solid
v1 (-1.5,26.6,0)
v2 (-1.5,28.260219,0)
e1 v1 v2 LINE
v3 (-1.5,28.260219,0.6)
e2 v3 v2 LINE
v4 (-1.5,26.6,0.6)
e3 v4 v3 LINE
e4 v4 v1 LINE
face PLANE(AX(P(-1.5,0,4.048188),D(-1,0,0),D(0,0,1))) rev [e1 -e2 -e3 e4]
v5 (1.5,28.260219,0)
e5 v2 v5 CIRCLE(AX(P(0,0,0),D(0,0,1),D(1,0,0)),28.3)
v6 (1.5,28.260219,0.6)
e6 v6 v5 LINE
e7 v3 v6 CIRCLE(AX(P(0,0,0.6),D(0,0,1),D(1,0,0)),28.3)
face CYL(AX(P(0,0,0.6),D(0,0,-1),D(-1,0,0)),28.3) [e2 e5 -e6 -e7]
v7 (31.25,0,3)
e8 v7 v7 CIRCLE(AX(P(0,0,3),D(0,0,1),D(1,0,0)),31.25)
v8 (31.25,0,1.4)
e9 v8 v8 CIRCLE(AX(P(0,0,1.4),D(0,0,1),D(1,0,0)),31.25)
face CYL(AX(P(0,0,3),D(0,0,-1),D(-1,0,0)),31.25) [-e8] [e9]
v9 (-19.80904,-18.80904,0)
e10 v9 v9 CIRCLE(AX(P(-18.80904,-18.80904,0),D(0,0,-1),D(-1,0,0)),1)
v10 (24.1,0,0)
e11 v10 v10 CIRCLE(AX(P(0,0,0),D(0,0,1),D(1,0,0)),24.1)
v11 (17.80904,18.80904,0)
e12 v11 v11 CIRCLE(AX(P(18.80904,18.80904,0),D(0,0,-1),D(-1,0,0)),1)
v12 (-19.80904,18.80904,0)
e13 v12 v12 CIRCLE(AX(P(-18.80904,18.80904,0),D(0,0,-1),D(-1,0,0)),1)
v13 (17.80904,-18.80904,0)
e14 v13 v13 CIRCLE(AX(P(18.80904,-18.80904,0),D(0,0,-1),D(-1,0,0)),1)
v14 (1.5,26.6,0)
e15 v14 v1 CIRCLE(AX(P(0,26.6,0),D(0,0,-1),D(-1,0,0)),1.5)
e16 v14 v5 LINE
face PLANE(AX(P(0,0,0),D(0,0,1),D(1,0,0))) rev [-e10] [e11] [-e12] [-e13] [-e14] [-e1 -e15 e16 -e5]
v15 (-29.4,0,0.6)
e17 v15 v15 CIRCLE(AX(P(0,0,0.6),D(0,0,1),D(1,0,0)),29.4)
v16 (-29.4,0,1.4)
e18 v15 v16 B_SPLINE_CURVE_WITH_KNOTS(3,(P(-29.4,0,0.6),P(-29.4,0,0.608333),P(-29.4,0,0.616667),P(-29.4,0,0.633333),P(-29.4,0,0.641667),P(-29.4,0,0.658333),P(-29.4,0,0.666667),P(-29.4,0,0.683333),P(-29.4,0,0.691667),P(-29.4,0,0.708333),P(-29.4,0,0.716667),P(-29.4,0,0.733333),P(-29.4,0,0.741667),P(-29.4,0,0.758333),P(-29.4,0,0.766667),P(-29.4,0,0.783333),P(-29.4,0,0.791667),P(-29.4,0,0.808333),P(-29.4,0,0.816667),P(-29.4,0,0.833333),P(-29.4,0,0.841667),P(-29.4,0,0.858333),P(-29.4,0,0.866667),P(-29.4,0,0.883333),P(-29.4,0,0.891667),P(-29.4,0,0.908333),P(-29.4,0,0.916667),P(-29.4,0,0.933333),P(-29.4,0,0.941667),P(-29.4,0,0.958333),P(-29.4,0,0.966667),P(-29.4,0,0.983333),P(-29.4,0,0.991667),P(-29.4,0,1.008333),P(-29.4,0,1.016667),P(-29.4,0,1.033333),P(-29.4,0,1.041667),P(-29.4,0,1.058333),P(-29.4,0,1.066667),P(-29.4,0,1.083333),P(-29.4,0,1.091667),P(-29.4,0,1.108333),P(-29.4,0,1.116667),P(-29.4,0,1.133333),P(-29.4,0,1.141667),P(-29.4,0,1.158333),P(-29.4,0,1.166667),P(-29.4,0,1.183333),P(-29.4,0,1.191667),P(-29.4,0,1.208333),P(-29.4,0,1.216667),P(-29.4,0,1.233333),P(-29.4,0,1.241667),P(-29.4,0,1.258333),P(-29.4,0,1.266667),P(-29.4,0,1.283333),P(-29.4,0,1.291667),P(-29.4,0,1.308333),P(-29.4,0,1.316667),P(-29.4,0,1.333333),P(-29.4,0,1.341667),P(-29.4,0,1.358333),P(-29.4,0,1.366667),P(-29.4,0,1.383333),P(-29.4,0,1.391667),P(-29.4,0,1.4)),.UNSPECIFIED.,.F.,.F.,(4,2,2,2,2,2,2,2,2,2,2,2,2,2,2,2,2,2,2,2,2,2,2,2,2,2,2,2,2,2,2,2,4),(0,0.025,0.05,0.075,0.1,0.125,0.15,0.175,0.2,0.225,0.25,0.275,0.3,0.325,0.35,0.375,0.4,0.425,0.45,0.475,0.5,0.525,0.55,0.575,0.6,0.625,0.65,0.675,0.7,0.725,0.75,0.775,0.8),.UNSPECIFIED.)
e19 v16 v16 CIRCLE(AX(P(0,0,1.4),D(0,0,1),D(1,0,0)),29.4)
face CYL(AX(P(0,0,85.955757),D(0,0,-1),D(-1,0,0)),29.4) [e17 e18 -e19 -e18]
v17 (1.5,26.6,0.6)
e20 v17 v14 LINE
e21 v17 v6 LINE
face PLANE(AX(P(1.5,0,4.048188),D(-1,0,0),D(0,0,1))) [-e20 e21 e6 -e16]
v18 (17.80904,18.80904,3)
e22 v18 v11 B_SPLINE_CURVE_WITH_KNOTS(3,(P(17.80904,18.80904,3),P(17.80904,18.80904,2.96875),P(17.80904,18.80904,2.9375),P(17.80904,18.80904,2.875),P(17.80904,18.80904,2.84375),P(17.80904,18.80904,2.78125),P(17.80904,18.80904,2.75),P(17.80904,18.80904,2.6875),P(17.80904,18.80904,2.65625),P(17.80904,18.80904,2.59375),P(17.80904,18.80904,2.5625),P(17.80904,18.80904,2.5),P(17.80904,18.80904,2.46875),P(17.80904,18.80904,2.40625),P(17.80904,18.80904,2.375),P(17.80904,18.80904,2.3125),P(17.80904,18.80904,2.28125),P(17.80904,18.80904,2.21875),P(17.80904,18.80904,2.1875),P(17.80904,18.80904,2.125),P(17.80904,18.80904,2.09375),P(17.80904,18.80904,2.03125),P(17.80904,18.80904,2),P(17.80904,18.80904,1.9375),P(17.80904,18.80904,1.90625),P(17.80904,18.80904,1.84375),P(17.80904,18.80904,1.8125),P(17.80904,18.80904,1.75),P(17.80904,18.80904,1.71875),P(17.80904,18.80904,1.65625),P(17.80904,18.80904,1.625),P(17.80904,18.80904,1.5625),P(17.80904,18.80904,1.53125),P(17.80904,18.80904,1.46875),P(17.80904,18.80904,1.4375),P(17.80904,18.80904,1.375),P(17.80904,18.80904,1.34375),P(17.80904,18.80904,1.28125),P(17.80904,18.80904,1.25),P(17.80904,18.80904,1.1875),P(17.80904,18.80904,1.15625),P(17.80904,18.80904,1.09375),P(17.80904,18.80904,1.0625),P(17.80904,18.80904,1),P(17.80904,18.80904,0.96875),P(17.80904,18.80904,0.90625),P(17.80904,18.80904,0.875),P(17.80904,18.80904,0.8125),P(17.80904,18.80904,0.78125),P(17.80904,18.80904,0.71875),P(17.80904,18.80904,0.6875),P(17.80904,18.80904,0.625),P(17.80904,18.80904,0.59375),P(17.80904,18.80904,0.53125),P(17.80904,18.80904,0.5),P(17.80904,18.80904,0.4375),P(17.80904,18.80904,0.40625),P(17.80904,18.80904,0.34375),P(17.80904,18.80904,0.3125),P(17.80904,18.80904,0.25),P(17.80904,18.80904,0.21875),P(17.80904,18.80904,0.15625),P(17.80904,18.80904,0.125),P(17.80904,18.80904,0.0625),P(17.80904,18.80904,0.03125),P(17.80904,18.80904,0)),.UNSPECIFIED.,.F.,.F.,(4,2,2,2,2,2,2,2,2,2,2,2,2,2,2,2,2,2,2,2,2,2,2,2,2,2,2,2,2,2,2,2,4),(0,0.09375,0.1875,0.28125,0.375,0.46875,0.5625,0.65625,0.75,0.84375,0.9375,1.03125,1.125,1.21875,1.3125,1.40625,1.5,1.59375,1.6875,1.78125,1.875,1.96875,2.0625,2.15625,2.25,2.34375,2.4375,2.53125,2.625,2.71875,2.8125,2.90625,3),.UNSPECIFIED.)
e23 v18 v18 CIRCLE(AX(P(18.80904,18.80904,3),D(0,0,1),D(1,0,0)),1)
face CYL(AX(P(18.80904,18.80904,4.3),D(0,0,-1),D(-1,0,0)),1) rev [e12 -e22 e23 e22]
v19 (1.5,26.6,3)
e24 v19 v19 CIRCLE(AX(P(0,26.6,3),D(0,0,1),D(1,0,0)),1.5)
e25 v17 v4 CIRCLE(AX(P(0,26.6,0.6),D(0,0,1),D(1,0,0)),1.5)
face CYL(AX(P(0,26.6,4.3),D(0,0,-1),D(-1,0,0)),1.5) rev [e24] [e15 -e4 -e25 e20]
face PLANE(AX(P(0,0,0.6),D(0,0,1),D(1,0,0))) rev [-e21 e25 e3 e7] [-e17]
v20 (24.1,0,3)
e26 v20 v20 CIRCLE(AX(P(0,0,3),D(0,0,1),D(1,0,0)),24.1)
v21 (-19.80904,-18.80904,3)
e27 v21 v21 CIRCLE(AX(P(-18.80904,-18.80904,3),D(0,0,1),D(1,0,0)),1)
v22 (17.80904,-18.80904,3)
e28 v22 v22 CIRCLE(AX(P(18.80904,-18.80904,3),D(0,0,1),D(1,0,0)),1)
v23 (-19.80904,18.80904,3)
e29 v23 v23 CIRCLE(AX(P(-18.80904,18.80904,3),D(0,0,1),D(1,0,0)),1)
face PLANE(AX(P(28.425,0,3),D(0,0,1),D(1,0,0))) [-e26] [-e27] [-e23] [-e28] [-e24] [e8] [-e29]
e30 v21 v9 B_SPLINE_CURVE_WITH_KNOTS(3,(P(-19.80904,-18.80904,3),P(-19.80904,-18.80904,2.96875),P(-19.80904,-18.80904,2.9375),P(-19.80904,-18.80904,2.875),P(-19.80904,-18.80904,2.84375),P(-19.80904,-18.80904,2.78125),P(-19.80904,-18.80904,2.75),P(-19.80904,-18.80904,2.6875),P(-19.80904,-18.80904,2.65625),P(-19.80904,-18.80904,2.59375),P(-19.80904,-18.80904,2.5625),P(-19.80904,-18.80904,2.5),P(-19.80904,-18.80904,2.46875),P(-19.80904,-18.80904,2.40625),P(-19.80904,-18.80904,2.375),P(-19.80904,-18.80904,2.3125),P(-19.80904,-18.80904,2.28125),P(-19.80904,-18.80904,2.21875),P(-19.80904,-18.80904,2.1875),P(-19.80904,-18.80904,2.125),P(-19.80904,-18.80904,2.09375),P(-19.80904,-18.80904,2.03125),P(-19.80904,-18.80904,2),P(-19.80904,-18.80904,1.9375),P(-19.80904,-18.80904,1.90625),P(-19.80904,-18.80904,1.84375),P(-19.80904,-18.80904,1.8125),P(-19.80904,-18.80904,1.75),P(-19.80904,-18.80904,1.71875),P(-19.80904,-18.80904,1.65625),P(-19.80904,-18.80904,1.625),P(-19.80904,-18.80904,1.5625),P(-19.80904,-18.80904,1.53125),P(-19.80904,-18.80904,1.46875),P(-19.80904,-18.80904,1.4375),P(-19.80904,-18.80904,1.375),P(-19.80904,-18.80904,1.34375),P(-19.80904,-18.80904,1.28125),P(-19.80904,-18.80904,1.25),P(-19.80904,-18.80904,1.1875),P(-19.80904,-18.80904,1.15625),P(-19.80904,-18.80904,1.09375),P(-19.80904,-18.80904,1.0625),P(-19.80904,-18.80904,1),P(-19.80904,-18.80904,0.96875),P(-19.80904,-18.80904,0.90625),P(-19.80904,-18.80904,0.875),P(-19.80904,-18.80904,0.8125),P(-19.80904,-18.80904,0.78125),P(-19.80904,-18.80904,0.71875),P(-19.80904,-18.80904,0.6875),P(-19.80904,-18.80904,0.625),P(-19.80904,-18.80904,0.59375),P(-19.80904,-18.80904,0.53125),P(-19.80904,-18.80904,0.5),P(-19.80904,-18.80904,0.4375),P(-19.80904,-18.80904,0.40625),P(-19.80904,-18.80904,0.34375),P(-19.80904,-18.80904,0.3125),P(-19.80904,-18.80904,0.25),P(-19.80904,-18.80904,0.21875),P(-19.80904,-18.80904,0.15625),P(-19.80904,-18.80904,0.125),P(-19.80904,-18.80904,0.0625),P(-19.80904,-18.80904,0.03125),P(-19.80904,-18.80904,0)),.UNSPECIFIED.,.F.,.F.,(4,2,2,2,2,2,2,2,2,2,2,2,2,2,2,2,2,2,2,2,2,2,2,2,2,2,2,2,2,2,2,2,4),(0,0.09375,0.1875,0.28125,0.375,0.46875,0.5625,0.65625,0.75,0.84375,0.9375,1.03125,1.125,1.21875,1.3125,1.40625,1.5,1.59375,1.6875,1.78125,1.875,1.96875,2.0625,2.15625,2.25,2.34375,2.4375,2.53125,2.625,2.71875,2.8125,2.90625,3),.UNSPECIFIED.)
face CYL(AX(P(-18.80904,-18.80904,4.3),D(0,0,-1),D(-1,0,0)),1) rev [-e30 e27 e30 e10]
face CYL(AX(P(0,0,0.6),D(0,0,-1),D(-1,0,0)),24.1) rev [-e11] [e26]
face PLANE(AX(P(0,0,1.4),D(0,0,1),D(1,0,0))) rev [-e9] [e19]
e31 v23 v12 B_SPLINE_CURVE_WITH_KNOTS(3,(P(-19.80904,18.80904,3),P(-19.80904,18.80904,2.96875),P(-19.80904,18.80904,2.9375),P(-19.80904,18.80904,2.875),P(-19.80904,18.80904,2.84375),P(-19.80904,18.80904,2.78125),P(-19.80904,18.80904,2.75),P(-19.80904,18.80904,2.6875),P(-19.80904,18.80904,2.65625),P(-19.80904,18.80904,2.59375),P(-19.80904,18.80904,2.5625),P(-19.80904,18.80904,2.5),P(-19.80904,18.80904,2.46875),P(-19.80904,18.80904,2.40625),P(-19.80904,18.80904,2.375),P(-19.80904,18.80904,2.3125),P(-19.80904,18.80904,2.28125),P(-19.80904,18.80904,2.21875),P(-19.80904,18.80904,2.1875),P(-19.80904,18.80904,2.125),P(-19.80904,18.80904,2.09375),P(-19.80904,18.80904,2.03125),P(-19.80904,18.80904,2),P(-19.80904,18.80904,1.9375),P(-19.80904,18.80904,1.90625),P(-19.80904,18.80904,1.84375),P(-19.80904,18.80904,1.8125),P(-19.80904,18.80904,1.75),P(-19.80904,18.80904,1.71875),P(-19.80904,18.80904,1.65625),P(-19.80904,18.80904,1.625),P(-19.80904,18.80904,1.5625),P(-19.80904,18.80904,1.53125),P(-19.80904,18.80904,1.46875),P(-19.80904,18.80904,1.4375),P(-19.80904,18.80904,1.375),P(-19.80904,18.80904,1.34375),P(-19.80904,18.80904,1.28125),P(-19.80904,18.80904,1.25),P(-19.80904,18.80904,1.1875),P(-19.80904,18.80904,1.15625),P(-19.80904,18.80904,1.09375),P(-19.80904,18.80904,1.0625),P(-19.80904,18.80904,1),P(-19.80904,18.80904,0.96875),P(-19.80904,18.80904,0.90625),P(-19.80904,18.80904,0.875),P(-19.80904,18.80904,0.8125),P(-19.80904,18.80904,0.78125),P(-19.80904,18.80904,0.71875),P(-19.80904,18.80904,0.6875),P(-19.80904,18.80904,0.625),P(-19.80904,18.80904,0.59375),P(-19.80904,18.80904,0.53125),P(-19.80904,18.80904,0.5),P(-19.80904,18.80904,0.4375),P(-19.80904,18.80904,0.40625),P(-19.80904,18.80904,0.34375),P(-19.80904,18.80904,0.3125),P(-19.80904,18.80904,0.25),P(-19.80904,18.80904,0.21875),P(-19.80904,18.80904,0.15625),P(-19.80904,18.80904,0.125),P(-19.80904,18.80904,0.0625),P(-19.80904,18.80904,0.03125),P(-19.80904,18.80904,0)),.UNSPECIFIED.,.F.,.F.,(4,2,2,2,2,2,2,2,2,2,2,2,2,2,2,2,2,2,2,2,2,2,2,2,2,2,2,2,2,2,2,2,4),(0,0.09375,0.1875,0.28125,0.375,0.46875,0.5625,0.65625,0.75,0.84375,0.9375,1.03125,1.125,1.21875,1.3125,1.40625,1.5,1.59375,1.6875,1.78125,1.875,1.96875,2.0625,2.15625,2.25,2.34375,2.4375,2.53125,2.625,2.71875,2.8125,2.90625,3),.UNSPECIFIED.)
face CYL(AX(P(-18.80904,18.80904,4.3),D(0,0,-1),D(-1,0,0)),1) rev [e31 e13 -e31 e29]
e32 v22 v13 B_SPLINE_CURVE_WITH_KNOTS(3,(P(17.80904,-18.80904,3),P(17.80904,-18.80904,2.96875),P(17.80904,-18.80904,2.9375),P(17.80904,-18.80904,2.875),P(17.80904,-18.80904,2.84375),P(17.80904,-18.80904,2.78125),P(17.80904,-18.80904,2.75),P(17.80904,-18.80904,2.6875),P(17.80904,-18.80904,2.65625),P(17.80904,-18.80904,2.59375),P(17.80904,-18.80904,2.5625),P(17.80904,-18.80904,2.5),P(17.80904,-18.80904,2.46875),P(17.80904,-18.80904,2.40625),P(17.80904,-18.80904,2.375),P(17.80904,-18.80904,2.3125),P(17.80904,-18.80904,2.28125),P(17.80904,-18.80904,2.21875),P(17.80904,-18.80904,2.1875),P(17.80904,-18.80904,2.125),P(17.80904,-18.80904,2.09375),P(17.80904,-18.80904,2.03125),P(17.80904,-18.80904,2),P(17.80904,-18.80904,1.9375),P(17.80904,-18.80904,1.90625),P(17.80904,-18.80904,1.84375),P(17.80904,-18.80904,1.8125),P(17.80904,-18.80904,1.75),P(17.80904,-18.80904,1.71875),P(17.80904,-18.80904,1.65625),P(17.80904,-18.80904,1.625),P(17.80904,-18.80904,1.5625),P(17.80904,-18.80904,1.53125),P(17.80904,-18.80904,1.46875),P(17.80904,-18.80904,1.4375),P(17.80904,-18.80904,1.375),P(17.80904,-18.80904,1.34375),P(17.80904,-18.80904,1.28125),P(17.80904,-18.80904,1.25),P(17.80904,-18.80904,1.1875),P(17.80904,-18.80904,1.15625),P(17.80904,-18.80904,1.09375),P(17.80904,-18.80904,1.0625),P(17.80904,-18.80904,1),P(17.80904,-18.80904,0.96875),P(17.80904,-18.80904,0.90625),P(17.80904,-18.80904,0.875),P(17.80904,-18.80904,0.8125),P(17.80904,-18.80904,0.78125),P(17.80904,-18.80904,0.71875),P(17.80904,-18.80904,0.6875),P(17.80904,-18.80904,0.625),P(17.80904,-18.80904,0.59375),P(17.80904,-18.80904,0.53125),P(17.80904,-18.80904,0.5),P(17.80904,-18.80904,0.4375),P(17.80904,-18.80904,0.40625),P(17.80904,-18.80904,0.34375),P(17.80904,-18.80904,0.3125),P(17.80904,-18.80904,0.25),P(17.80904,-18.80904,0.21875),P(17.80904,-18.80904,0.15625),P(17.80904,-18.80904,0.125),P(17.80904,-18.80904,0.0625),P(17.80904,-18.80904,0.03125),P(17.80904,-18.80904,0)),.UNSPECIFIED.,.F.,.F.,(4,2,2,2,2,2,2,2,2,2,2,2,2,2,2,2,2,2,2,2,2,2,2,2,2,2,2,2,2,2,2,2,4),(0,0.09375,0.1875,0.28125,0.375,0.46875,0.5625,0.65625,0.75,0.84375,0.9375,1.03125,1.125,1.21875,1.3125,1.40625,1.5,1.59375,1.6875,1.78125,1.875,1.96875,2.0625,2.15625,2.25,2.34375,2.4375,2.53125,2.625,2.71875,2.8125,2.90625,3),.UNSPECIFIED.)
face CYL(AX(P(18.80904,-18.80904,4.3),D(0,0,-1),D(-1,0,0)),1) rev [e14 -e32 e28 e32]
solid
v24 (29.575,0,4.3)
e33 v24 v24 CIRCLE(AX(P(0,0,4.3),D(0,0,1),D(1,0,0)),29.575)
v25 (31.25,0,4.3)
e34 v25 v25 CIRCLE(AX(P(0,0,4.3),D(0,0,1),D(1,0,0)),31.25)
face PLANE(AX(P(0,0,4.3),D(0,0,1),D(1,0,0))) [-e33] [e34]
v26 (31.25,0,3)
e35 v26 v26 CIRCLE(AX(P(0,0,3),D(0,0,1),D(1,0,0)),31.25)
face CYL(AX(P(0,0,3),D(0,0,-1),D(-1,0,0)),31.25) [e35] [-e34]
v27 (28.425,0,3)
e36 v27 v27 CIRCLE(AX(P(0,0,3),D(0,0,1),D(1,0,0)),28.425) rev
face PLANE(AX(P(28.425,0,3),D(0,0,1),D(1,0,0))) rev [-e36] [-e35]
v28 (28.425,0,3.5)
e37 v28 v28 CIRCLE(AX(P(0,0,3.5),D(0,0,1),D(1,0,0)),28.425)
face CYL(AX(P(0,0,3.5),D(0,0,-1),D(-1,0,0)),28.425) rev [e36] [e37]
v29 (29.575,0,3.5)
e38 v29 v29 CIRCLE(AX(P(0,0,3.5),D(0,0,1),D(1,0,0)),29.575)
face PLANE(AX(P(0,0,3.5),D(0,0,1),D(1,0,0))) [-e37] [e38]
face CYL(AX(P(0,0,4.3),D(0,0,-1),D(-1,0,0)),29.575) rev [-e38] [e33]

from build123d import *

# Parameters (mm, degrees)
SKETCH1_R            = 28.3
SKETCH1_R_2          = 24.1
BOSS_EXTRUDE1_DEPTH  = 0.6
SKETCH2_R            = 29.4
SKETCH2_R_2          = 24.1
BOSS_EXTRUDE2_DEPTH  = 0.8
SKETCH3_R            = 31.25
SKETCH3_R_2          = 24.1
BOSS_EXTRUDE3_DEPTH  = 1.6
SKETCH4_R            = 31.25
SKETCH4_R_2          = 28.425
BOSS_EXTRUDE4_DEPTH  = 0.5
SKETCH5_R            = 31.25
SKETCH5_R_2          = 29.575
BOSS_EXTRUDE5_DEPTH  = 0.8
SKETCH6_R            = 1
SKETCH6_R_2          = 1.5
CUT_EXTRUDE1_DEPTH   = 45.402871529
CUT_EXTRUDE2_DEPTH   = 0.6
SPLIT1_START         = 3
SPLIT1_OUTLINE_R     = 31.25
SPLIT1_OUTLINE_R_2   = 28.425
SPLIT1_DEPTH         = 1.3
SPLIT1_2_OUTLINE_R   = 31.25
SPLIT1_2_OUTLINE_R_2 = 29.575
SPLIT1_2_DEPTH       = 1.3
SPLIT1_3_OUTLINE_R   = 29.575
SPLIT1_3_OUTLINE_R_2 = 28.425
SPLIT1_3_DEPTH       = 0.5


# Read off the part's stored shape, not the designer's step: Split1
with BuildPart() as part:
    # Sketch1 → Boss-Extrude1 (new body)
    with BuildSketch(Plane.XY):
        Circle(SKETCH1_R)
        Circle(SKETCH1_R_2, mode=Mode.SUBTRACT)
    extrude(amount=BOSS_EXTRUDE1_DEPTH)

    # Sketch2 → Boss-Extrude2 (add)
    with BuildSketch(Plane.XY.offset(0.6)):
        with Locations(Location((0, 0, 0), (0, 0, 180))):
            Circle(SKETCH2_R)
        Circle(SKETCH2_R_2, mode=Mode.SUBTRACT)
    extrude(amount=BOSS_EXTRUDE2_DEPTH)

    # Sketch3 → Boss-Extrude3 (add)
    with BuildSketch(Plane.XY.offset(1.4)):
        Circle(SKETCH3_R)
        Circle(SKETCH3_R_2, mode=Mode.SUBTRACT)
    extrude(amount=BOSS_EXTRUDE3_DEPTH)

    # Sketch4 → Boss-Extrude4 (add)
    with BuildSketch(Plane.XY.offset(3)):
        Circle(SKETCH4_R)
        Circle(SKETCH4_R_2, mode=Mode.SUBTRACT)
    extrude(amount=BOSS_EXTRUDE4_DEPTH)

    # Sketch5 → Boss-Extrude5 (add)
    with BuildSketch(Plane.XY.offset(3.5)):
        Circle(SKETCH5_R)
        Circle(SKETCH5_R_2, mode=Mode.SUBTRACT)
    extrude(amount=BOSS_EXTRUDE5_DEPTH)

    # Sketch6 → Cut-Extrude1 (cut, through all)
    with BuildSketch(Plane(origin=(0, 0, 0), x_dir=(-1, 0, 0), z_dir=(0, 0, -1))):
        with Locations((18.80904038, 18.80904038)):
            Circle(SKETCH6_R)
        with Locations((18.80904038, -18.80904038)):
            Circle(SKETCH6_R)
        with Locations((-18.80904038, -18.80904038)):
            Circle(SKETCH6_R)
        with Locations((-18.80904038, 18.80904038)):
            Circle(SKETCH6_R)
        with Locations((0, 26.6)):
            Circle(SKETCH6_R_2)
    extrude(amount=-CUT_EXTRUDE1_DEPTH, mode=Mode.SUBTRACT)

    # Sketch7 → Cut-Extrude2 (cut)
    with BuildSketch(Plane(origin=(0, 0, 0), x_dir=(-1, 0, 0), z_dir=(0, 0, -1))):
        with BuildLine():
            Line((-1.5, 28.260219391), (-1.5, 26.6))
            ThreePointArc((-1.5, 26.6), (0, 28.1), (1.5, 26.6))
            Line((1.5, 26.6), (1.5, 28.260219391))
            ThreePointArc((1.5, 28.260219391), (0, 28.3), (-1.5, 28.260219391))
        make_face()
    extrude(amount=-CUT_EXTRUDE2_DEPTH, mode=Mode.SUBTRACT)

    # Split1 outline → Split1 (cut)
    with BuildSketch(Plane.XY.offset(SPLIT1_START)):
        Circle(SPLIT1_OUTLINE_R)
        Circle(SPLIT1_OUTLINE_R_2, mode=Mode.SUBTRACT)
    extrude(amount=SPLIT1_DEPTH, mode=Mode.SUBTRACT)


with BuildPart() as body_2:
    # Split1 2 outline → Split1 2 (new body)
    with BuildSketch(Plane.XY.offset(SPLIT1_START)):
        Circle(SPLIT1_2_OUTLINE_R)
        Circle(SPLIT1_2_OUTLINE_R_2, mode=Mode.SUBTRACT)
    extrude(amount=SPLIT1_2_DEPTH)

    # Split1 3 outline → Split1 3 (add)
    with BuildSketch(Plane.XY.offset(SPLIT1_START)):
        Circle(SPLIT1_3_OUTLINE_R)
        Circle(SPLIT1_3_OUTLINE_R_2, mode=Mode.SUBTRACT)
    extrude(amount=SPLIT1_3_DEPTH)


solid = Compound([part.part, body_2.part])
